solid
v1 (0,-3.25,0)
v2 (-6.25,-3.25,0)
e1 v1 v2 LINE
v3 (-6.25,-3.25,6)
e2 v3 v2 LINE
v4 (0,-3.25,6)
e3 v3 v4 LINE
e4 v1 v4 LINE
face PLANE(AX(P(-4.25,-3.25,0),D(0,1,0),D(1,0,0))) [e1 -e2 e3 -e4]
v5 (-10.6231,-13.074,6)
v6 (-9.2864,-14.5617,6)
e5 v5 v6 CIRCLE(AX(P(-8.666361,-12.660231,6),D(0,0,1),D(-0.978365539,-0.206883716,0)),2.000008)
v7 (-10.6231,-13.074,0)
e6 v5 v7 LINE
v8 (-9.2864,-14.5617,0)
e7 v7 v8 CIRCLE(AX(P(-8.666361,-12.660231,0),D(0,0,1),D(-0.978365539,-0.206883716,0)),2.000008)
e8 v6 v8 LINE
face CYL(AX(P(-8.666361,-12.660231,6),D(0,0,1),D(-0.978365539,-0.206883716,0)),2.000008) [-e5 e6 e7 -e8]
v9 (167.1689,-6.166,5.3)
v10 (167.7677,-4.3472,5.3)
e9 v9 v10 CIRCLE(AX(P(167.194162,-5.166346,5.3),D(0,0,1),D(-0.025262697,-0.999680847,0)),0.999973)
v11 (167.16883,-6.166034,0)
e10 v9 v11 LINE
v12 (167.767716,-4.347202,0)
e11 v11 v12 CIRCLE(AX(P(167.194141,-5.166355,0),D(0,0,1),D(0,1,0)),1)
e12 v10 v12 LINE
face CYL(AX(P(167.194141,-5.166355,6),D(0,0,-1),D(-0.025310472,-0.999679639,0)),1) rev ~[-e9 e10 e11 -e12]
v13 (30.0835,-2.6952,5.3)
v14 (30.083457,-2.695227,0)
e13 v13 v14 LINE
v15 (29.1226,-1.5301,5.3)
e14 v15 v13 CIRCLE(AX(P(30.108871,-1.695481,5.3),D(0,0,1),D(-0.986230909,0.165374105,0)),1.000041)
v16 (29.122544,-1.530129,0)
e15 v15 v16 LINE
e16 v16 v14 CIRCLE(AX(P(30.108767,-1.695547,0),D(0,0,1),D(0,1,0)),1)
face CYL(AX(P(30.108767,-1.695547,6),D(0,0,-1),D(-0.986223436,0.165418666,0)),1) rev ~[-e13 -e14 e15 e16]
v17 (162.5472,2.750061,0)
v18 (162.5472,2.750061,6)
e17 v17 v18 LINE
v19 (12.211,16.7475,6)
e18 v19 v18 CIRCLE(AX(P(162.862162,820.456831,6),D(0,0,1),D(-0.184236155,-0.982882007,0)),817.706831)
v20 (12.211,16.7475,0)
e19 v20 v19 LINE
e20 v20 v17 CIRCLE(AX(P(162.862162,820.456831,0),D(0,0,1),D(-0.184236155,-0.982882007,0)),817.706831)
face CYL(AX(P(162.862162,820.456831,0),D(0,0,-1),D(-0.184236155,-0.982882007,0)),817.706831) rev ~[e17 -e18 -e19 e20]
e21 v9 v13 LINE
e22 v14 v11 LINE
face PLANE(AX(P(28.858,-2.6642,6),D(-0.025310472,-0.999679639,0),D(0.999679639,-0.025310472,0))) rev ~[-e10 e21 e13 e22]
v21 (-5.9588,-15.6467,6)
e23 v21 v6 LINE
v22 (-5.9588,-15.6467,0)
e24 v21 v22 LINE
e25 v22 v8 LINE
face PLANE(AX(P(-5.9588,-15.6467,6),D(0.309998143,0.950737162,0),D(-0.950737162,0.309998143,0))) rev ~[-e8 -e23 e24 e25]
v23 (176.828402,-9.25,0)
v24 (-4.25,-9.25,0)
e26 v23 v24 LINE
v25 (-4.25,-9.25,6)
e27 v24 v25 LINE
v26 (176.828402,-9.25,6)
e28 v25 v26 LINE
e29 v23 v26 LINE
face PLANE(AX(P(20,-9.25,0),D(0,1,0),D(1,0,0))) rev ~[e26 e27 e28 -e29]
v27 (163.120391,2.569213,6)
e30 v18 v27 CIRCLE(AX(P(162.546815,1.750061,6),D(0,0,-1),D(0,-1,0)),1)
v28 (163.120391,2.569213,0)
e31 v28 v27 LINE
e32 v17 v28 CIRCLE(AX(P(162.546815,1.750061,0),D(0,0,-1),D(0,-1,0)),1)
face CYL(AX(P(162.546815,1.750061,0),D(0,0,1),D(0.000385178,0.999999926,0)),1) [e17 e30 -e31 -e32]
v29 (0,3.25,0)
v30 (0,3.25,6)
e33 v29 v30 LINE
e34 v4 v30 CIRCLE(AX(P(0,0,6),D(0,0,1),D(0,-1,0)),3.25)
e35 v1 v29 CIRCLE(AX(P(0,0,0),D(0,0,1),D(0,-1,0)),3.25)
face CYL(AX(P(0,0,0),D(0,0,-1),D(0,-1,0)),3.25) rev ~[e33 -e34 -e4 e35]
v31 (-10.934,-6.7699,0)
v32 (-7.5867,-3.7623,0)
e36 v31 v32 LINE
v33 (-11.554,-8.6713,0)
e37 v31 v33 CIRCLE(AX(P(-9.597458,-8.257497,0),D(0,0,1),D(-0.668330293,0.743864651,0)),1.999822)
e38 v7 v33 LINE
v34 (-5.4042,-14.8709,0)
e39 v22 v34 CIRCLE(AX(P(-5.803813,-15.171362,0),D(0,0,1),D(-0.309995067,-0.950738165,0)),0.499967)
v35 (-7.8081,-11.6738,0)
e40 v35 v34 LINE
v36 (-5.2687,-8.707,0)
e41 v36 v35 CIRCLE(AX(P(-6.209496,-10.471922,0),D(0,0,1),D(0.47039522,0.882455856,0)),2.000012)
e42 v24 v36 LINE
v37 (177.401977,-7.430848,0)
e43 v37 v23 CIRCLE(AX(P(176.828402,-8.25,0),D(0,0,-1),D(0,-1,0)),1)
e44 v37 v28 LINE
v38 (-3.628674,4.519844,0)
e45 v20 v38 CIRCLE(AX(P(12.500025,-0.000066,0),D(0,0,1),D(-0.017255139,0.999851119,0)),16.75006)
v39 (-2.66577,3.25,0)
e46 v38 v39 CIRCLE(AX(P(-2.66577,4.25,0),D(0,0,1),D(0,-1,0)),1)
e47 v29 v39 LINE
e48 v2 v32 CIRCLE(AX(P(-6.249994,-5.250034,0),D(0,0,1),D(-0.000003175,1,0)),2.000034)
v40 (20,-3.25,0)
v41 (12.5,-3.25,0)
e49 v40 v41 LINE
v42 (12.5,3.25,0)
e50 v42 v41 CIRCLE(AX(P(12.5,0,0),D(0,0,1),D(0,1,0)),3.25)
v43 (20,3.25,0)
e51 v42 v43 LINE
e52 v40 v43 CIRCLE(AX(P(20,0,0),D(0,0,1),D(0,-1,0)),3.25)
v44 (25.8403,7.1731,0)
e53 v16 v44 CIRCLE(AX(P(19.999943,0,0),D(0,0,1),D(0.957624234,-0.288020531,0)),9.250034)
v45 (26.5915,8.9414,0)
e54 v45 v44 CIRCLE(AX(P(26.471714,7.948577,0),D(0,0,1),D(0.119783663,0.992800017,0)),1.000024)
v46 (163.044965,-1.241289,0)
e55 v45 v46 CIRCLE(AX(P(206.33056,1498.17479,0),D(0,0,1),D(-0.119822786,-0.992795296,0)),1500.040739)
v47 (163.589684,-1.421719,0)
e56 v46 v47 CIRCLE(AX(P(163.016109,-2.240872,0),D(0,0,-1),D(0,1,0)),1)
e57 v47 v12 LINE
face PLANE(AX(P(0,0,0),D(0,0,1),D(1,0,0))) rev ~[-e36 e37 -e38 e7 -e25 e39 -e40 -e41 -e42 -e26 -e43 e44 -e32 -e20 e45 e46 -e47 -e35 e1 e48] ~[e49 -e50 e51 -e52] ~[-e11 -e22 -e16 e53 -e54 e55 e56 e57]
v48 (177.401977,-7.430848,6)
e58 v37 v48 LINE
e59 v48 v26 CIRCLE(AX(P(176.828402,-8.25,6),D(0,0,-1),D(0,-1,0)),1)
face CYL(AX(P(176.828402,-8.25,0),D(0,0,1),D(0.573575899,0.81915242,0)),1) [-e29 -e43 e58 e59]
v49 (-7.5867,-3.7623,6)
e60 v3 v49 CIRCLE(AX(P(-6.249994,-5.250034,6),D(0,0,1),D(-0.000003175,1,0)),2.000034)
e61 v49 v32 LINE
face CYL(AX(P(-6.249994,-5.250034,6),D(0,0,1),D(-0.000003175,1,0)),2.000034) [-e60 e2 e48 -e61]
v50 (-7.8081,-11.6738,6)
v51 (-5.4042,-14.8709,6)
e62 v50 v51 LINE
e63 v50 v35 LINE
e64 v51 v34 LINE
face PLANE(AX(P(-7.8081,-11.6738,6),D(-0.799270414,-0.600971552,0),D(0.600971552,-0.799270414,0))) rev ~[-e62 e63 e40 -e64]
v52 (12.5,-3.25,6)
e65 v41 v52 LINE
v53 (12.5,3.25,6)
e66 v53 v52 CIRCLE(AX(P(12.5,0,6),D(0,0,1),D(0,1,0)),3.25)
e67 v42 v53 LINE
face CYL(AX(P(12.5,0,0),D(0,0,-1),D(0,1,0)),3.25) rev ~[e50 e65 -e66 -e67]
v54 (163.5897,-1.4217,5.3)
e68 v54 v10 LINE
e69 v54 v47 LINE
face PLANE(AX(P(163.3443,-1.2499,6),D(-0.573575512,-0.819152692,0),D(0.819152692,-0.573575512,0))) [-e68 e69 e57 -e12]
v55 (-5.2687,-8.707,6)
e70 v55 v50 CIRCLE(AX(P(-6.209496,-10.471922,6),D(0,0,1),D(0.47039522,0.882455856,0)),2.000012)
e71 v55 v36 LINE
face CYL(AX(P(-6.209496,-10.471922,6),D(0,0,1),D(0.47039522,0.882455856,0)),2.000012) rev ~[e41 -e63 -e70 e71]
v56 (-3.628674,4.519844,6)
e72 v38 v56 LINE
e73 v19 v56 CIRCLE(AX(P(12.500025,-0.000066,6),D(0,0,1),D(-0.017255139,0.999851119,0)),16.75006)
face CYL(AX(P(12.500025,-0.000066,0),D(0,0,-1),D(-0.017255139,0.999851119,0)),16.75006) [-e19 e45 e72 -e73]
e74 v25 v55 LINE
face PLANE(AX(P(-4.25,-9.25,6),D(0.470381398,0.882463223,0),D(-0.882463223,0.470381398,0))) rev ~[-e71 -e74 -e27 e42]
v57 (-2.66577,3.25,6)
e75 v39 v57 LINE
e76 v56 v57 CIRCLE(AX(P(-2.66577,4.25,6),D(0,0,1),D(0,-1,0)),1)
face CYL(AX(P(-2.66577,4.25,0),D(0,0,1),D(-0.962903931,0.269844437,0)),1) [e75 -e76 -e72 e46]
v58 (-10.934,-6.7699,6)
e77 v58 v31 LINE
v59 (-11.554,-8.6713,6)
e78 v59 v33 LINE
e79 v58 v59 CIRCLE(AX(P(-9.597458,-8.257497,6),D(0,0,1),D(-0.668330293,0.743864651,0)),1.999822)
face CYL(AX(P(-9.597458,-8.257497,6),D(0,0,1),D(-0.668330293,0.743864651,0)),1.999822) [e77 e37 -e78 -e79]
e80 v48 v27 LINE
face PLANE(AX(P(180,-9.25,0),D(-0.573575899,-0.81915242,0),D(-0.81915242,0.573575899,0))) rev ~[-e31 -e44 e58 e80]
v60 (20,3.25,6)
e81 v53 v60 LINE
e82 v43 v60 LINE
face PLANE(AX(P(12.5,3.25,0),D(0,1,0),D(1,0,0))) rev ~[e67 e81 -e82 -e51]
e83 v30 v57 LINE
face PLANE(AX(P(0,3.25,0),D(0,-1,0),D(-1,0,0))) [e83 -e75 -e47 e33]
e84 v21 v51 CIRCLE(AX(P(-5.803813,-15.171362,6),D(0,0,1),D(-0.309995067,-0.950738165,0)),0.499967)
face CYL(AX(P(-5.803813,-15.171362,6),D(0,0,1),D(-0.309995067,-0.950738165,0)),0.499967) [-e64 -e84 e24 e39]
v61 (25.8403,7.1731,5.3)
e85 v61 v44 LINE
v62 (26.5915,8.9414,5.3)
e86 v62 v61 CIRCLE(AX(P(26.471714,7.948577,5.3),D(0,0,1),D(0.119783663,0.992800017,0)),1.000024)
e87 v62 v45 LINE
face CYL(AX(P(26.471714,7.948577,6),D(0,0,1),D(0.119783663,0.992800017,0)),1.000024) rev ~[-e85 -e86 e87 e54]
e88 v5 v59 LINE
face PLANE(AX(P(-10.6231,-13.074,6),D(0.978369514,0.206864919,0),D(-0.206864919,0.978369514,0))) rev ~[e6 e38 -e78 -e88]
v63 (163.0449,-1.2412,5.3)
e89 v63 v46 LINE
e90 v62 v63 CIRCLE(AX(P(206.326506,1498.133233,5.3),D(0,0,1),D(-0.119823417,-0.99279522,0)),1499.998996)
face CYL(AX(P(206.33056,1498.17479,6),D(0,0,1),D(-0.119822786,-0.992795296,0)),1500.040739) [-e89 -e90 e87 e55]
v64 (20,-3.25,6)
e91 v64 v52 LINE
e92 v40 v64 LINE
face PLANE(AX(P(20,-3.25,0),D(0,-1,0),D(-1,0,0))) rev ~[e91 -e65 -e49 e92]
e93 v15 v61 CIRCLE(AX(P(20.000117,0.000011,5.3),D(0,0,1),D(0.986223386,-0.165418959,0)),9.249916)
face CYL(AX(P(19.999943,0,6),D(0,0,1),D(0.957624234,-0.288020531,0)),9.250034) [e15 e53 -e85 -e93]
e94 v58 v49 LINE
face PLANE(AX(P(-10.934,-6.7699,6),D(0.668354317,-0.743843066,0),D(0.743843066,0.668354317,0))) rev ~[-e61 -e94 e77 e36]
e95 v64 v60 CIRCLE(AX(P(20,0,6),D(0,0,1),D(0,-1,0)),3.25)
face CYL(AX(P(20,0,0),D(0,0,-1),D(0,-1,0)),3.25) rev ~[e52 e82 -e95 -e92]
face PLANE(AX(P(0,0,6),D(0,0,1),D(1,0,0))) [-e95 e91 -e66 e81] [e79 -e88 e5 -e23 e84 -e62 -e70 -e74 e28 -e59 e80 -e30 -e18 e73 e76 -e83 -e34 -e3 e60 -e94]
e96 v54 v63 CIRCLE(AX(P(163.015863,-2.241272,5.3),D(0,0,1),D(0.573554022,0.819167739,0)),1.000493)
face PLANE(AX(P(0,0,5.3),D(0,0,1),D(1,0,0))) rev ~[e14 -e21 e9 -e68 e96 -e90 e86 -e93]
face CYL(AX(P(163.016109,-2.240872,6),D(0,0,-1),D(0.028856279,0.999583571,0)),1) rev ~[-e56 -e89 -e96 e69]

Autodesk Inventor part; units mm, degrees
ref_plane "YZ Plane" through (0, 0, 0) normal (1, 0, 0) x (0, 1, 0)
ref_plane "XZ Plane" through (0, 0, 0) normal (0, 1, 0) x (-1, 0, 0)
ref_plane "XY Plane" through (0, 0, 0) normal (0, 0, 1) x (1, 0, 0)
sketch "スケッチ4" plane through (0, 0, 0) normal (0, 0, 1) x (1, 0, 0)
  arc A0 (0, -3.25) -> (0, 3.25) centre (0, 0) ccw
  circle A1 centre (-7.5, 0) radius 3.25 construction
  arc A2 (12.5, 3.25) -> (12.5, -3.25) centre (12.5, 0) ccw
  arc A3 (20, -3.25) -> (20, 3.25) centre (20, 0) ccw
  arc A4 (12.5, 20) -> (-7.5, 0) centre (12.5, 0) ccw construction
  line L0 (12.5, 3.25) -> (20, 3.25)
  line L1 (20, -3.25) -> (12.5, -3.25)
  arc A5 (12.5, 16.75) -> (12.211, 16.7475) centre (12.5, 0) ccw construction
  circle A6 centre (12.5, 20) radius 3.25 construction
  line L2 (0, 3.25) -> (-3.9317, 3.25)
  line L3 (-7.5, -3.25) -> (-4.25, -3.25) construction
  line L4 (20, 9.25) -> (12.5, 9.25)
  arc A7 (12.5, 9.25) -> (12.5, -9.25) centre (12.5, 0) ccw construction
  line L5 (12.5, -9.25) -> (20, -9.25)
  arc A8 (20, -9.25) -> (20, 9.25) centre (20, 0) ccw
  line L6 (-3.9317, 3.25) -> (-7.5, 3.25) construction
  line L7 (-4.25, 0) -> (-4.25, -3.25) construction
  line L8 (-4.25, -3.25) -> (0, -3.25)
  arc A9 (-3.9317, 3.25) -> (-4.25, 0) centre (12.5, 0) ccw construction
  line L9 (-4.25, -3.25) -> (-4.25, -9.25)
  line L10 (-4.25, -9.25) -> (12.5, -9.25)
  line L11 (20, -9.25) -> (180, -9.25)
  line L12 (180, -9.25) -> (162.8622, 2.75)
  line L13 (162.8622, 2.75) -> (162.8622, -9.25) construction
  arc A10 (11.9, 16.8059) -> (12.211, 16.7475) centre (162.8622, 820.4571) ccw construction
  arc A11 (12.211, 16.7475) -> (162.8622, 2.75) centre (162.8622, 820.4571) ccw
  arc A12 (12.211, 16.7475) -> (-3.9317, 3.25) centre (12.5, 0) ccw
  dimension "d39" = 6.5
  dimension "d40" = 6.5
  dimension "d41" = 6.5
  dimension "d42" = 6.5
  dimension "d43" = 7.5
  dimension "d44" = 7.5
  dimension "d46" = 20
  dimension "d47" = 6
  dimension "d48" = 160
  dimension "d49" = 35
  dimension "d50" = 12
extrude "押し出し3" add sketch "スケッチ4" along normal blind 6
sketch "スケッチ5" plane through (0, 0, 6) normal (0, 0, 1) x (1, 0, 0)
  line L0 (-4.25, -9.25) -> (-5.2687, -8.707)
  line L1 (-7.8081, -11.6738) -> (-5.4042, -14.8709)
  arc A0 (-10.6231, -13.074) -> (-9.2864, -14.5617) centre (-8.6663, -12.6602) ccw
  arc A1 (-5.9588, -15.6467) -> (-5.4042, -14.8709) centre (-5.8038, -15.1714) ccw
  line L2 (-5.9588, -15.6467) -> (-9.2864, -14.5617)
  arc A2 (-10.934, -6.7699) -> (-11.554, -8.6713) centre (-9.5973, -8.2576) ccw
  line L3 (-10.6231, -13.074) -> (-11.554, -8.6713)
  line L4 (-10.934, -6.7699) -> (-7.5867, -3.7623)
  arc A3 (-5.2687, -8.707) -> (-7.8081, -11.6738) centre (-6.2095, -10.4719) ccw
  arc A4 (-6.25, -3.25) -> (-7.5867, -3.7623) centre (-6.25, -5.25) ccw
  line L5 (-6.25, -3.25) -> (-4.25, -3.25)
  line L6 (-4.25, -3.25) -> (-4.25, -9.25)
  line L7 (-4.25, -3.25) -> (-4.25, -9.25) projected
  line L8 (0, -3.25) -> (-4.25, -3.25) projected
  point P0 (0, 0)
  dimension "d54" = 2
  dimension "d55" = 2
  dimension "d56" = 4.5
  dimension "d57" = 2
  dimension "d58" = 4.5
  dimension "d59" = 2
  dimension "d60" = 3.5
  dimension "d61" = 0.5
  dimension "d62" = 4
  dimension "d63" = 2
  dimension "d65" = 25
  dimension "d66" = 35
  dimension "d67" = 120
  dimension "d68" = 120
  dimension "d97" = 1.1544
  dimension "d98" = 61.94
extrude "押し出し4" add sketch "スケッチ5" against normal blind 6
fillet "フィレット2" radius 1 2 edges at (162.8622, 2.75, 3) (180, -9.25, 3)
sketch "スケッチ6" plane through (0, 0, 6) normal (0, 0, 1) x (1, 0, 0)
  arc A0 (12.211, 16.7475) -> (162.5472, 2.7501) centre (162.8622, 820.4571) ccw projected
  line L0 (-4.25, -9.25) -> (176.8284, -9.25) projected
  arc A1 (20, -3.25) -> (20, 3.25) centre (20, 0) ccw projected
  line L1 (12.5, 3.25) -> (20, 3.25) projected
  line L2 (20, -3.25) -> (12.5, -3.25) projected
  line L3 (177.402, -7.4308) -> (163.1204, 2.5692) projected
  arc A2 (176.8284, -9.25) -> (177.402, -7.4308) centre (176.8284, -8.25) ccw projected
  arc A3 (163.1204, 2.5692) -> (162.5472, 2.7501) centre (162.5468, 1.7501) ccw projected
  line L4 (163.3443, -1.2499) -> (170.4852, -6.25)
  arc A4 (12.211, 10.7475) -> (26.5915, 8.9414) centre (206.3266, 1498.1342) ccw construction
  line L5 (12.5, -2.25) -> (28.858, -2.6642) construction
  line L6 (163.3443, -1.2499) -> (163.3443, 2.7501)
  line L7 (12.5, 9.25) -> (20, 9.25) construction
  arc A5 (20, -9.25) -> (28.858, -2.6642) centre (20, 0) ccw construction
  line L8 (20, -9.25) -> (12.5, -9.25)
  arc A6 (26.5915, 8.9414) -> (25.8403, 7.1731) centre (26.4717, 7.9486) ccw
  arc A7 (28.858, -2.6642) -> (25.8403, 7.1731) centre (20, 0) ccw
  line L9 (28.858, -2.6642) -> (170.4852, -6.25)
  arc A8 (26.5915, 8.9414) -> (163.3443, -1.2499) centre (206.3266, 1498.1342) ccw
  arc A9 (25.8403, 7.1731) -> (20, 9.25) centre (20, 0) ccw construction
  point P0 (0, 0)
  dimension "d73" = 3
  dimension "d74" = 6
  dimension "d75" = 7
  dimension "d76" = 4
  dimension "d77" = 3
  dimension "d80" = 1500
  dimension "d81" = 6
  dimension "d82" = 2
extrude "押し出し5" cut sketch "スケッチ6" against normal blind 6
fillet "フィレット3" radius 1 3 edges at (163.3443, -1.2499, 3) (28.858, -2.6642, 3) (170.4852, -6.25, 3)
sketch "スケッチ8" plane through (0, 0, 6) normal (0, 0, 1) x (1, 0, 0)
  arc A0 (26.5915, 8.9414) -> (163.0449, -1.2412) centre (206.3266, 1498.1342) ccw projected
  arc A1 (163.5897, -1.4217) -> (163.0449, -1.2412) centre (163.0161, -2.2408) ccw projected
  line L0 (163.5897, -1.4217) -> (167.7677, -4.3472) projected
  arc A2 (167.1689, -6.166) -> (167.7677, -4.3472) centre (167.1942, -5.1664) ccw projected
  line L1 (167.1689, -6.166) -> (30.0835, -2.6952) projected
  arc A3 (29.1226, -1.5301) -> (30.0835, -2.6952) centre (30.1088, -1.6955) ccw projected
  arc A4 (29.1226, -1.5301) -> (25.8403, 7.1731) centre (20, 0) ccw projected
  arc A5 (26.5915, 8.9414) -> (25.8403, 7.1731) centre (26.4717, 7.9486) ccw projected
  arc A6 (176.8284, -9.25) -> (177.402, -7.4308) centre (176.8284, -8.25) ccw projected
  line L2 (177.402, -7.4308) -> (163.1204, 2.5692) projected
  arc A7 (163.1204, 2.5692) -> (162.5472, 2.7501) centre (162.5468, 1.7501) ccw projected
  arc A8 (12.211, 16.7475) -> (162.5472, 2.7501) centre (162.8622, 820.4571) ccw projected
  arc A9 (12.211, 16.7475) -> (-3.9317, 3.25) centre (12.5, 0) ccw projected
  line L3 (-3.9317, 3.25) -> (0, 3.25) projected
  arc A10 (0, -3.25) -> (0, 3.25) centre (0, 0) ccw projected
  arc A11 (-6.25, -3.25) -> (-7.5867, -3.7623) centre (-6.25, -5.25) ccw projected
  line L4 (-7.5867, -3.7623) -> (-10.934, -6.7699) projected
  arc A12 (-10.934, -6.7699) -> (-11.554, -8.6713) centre (-9.5973, -8.2576) ccw projected
  line L5 (-11.554, -8.6713) -> (-10.6231, -13.074) projected
  arc A13 (-10.6231, -13.074) -> (-9.2864, -14.5617) centre (-8.6663, -12.6602) ccw projected
  line L6 (-9.2864, -14.5617) -> (-5.9588, -15.6467) projected
  arc A14 (-5.9588, -15.6467) -> (-5.4042, -14.8709) centre (-5.8038, -15.1714) ccw projected
  line L7 (-5.4042, -14.8709) -> (-7.8081, -11.6738) projected
  arc A15 (-5.2687, -8.707) -> (-7.8081, -11.6738) centre (-6.2095, -10.4719) ccw projected
  line L8 (-5.2687, -8.707) -> (-4.25, -9.25) projected
  line L9 (-4.25, -9.25) -> (176.8284, -9.25) projected
  line L10 (12.5, 3.25) -> (20, 3.25) projected
  arc A16 (20, -3.25) -> (20, 3.25) centre (20, 0) ccw projected
  line L11 (20, -3.25) -> (12.5, -3.25) projected
  arc A17 (12.5, 3.25) -> (12.5, -3.25) centre (12.5, 0) ccw projected
  line L12 (0, -3.25) -> (-6.25, -3.25) projected
extrude "押し出し6" add sketch "スケッチ8" against normal blind 0.7 contours A0 A1 L0 A2 L1 A3 A4 A5
fillet "フィレット5" radius 1 1 edges at (-3.9317, 3.25, 3)
equation "\"d44\" = d43"
properties part number "ウイング1" material "ポリカーボネート、クリア"
